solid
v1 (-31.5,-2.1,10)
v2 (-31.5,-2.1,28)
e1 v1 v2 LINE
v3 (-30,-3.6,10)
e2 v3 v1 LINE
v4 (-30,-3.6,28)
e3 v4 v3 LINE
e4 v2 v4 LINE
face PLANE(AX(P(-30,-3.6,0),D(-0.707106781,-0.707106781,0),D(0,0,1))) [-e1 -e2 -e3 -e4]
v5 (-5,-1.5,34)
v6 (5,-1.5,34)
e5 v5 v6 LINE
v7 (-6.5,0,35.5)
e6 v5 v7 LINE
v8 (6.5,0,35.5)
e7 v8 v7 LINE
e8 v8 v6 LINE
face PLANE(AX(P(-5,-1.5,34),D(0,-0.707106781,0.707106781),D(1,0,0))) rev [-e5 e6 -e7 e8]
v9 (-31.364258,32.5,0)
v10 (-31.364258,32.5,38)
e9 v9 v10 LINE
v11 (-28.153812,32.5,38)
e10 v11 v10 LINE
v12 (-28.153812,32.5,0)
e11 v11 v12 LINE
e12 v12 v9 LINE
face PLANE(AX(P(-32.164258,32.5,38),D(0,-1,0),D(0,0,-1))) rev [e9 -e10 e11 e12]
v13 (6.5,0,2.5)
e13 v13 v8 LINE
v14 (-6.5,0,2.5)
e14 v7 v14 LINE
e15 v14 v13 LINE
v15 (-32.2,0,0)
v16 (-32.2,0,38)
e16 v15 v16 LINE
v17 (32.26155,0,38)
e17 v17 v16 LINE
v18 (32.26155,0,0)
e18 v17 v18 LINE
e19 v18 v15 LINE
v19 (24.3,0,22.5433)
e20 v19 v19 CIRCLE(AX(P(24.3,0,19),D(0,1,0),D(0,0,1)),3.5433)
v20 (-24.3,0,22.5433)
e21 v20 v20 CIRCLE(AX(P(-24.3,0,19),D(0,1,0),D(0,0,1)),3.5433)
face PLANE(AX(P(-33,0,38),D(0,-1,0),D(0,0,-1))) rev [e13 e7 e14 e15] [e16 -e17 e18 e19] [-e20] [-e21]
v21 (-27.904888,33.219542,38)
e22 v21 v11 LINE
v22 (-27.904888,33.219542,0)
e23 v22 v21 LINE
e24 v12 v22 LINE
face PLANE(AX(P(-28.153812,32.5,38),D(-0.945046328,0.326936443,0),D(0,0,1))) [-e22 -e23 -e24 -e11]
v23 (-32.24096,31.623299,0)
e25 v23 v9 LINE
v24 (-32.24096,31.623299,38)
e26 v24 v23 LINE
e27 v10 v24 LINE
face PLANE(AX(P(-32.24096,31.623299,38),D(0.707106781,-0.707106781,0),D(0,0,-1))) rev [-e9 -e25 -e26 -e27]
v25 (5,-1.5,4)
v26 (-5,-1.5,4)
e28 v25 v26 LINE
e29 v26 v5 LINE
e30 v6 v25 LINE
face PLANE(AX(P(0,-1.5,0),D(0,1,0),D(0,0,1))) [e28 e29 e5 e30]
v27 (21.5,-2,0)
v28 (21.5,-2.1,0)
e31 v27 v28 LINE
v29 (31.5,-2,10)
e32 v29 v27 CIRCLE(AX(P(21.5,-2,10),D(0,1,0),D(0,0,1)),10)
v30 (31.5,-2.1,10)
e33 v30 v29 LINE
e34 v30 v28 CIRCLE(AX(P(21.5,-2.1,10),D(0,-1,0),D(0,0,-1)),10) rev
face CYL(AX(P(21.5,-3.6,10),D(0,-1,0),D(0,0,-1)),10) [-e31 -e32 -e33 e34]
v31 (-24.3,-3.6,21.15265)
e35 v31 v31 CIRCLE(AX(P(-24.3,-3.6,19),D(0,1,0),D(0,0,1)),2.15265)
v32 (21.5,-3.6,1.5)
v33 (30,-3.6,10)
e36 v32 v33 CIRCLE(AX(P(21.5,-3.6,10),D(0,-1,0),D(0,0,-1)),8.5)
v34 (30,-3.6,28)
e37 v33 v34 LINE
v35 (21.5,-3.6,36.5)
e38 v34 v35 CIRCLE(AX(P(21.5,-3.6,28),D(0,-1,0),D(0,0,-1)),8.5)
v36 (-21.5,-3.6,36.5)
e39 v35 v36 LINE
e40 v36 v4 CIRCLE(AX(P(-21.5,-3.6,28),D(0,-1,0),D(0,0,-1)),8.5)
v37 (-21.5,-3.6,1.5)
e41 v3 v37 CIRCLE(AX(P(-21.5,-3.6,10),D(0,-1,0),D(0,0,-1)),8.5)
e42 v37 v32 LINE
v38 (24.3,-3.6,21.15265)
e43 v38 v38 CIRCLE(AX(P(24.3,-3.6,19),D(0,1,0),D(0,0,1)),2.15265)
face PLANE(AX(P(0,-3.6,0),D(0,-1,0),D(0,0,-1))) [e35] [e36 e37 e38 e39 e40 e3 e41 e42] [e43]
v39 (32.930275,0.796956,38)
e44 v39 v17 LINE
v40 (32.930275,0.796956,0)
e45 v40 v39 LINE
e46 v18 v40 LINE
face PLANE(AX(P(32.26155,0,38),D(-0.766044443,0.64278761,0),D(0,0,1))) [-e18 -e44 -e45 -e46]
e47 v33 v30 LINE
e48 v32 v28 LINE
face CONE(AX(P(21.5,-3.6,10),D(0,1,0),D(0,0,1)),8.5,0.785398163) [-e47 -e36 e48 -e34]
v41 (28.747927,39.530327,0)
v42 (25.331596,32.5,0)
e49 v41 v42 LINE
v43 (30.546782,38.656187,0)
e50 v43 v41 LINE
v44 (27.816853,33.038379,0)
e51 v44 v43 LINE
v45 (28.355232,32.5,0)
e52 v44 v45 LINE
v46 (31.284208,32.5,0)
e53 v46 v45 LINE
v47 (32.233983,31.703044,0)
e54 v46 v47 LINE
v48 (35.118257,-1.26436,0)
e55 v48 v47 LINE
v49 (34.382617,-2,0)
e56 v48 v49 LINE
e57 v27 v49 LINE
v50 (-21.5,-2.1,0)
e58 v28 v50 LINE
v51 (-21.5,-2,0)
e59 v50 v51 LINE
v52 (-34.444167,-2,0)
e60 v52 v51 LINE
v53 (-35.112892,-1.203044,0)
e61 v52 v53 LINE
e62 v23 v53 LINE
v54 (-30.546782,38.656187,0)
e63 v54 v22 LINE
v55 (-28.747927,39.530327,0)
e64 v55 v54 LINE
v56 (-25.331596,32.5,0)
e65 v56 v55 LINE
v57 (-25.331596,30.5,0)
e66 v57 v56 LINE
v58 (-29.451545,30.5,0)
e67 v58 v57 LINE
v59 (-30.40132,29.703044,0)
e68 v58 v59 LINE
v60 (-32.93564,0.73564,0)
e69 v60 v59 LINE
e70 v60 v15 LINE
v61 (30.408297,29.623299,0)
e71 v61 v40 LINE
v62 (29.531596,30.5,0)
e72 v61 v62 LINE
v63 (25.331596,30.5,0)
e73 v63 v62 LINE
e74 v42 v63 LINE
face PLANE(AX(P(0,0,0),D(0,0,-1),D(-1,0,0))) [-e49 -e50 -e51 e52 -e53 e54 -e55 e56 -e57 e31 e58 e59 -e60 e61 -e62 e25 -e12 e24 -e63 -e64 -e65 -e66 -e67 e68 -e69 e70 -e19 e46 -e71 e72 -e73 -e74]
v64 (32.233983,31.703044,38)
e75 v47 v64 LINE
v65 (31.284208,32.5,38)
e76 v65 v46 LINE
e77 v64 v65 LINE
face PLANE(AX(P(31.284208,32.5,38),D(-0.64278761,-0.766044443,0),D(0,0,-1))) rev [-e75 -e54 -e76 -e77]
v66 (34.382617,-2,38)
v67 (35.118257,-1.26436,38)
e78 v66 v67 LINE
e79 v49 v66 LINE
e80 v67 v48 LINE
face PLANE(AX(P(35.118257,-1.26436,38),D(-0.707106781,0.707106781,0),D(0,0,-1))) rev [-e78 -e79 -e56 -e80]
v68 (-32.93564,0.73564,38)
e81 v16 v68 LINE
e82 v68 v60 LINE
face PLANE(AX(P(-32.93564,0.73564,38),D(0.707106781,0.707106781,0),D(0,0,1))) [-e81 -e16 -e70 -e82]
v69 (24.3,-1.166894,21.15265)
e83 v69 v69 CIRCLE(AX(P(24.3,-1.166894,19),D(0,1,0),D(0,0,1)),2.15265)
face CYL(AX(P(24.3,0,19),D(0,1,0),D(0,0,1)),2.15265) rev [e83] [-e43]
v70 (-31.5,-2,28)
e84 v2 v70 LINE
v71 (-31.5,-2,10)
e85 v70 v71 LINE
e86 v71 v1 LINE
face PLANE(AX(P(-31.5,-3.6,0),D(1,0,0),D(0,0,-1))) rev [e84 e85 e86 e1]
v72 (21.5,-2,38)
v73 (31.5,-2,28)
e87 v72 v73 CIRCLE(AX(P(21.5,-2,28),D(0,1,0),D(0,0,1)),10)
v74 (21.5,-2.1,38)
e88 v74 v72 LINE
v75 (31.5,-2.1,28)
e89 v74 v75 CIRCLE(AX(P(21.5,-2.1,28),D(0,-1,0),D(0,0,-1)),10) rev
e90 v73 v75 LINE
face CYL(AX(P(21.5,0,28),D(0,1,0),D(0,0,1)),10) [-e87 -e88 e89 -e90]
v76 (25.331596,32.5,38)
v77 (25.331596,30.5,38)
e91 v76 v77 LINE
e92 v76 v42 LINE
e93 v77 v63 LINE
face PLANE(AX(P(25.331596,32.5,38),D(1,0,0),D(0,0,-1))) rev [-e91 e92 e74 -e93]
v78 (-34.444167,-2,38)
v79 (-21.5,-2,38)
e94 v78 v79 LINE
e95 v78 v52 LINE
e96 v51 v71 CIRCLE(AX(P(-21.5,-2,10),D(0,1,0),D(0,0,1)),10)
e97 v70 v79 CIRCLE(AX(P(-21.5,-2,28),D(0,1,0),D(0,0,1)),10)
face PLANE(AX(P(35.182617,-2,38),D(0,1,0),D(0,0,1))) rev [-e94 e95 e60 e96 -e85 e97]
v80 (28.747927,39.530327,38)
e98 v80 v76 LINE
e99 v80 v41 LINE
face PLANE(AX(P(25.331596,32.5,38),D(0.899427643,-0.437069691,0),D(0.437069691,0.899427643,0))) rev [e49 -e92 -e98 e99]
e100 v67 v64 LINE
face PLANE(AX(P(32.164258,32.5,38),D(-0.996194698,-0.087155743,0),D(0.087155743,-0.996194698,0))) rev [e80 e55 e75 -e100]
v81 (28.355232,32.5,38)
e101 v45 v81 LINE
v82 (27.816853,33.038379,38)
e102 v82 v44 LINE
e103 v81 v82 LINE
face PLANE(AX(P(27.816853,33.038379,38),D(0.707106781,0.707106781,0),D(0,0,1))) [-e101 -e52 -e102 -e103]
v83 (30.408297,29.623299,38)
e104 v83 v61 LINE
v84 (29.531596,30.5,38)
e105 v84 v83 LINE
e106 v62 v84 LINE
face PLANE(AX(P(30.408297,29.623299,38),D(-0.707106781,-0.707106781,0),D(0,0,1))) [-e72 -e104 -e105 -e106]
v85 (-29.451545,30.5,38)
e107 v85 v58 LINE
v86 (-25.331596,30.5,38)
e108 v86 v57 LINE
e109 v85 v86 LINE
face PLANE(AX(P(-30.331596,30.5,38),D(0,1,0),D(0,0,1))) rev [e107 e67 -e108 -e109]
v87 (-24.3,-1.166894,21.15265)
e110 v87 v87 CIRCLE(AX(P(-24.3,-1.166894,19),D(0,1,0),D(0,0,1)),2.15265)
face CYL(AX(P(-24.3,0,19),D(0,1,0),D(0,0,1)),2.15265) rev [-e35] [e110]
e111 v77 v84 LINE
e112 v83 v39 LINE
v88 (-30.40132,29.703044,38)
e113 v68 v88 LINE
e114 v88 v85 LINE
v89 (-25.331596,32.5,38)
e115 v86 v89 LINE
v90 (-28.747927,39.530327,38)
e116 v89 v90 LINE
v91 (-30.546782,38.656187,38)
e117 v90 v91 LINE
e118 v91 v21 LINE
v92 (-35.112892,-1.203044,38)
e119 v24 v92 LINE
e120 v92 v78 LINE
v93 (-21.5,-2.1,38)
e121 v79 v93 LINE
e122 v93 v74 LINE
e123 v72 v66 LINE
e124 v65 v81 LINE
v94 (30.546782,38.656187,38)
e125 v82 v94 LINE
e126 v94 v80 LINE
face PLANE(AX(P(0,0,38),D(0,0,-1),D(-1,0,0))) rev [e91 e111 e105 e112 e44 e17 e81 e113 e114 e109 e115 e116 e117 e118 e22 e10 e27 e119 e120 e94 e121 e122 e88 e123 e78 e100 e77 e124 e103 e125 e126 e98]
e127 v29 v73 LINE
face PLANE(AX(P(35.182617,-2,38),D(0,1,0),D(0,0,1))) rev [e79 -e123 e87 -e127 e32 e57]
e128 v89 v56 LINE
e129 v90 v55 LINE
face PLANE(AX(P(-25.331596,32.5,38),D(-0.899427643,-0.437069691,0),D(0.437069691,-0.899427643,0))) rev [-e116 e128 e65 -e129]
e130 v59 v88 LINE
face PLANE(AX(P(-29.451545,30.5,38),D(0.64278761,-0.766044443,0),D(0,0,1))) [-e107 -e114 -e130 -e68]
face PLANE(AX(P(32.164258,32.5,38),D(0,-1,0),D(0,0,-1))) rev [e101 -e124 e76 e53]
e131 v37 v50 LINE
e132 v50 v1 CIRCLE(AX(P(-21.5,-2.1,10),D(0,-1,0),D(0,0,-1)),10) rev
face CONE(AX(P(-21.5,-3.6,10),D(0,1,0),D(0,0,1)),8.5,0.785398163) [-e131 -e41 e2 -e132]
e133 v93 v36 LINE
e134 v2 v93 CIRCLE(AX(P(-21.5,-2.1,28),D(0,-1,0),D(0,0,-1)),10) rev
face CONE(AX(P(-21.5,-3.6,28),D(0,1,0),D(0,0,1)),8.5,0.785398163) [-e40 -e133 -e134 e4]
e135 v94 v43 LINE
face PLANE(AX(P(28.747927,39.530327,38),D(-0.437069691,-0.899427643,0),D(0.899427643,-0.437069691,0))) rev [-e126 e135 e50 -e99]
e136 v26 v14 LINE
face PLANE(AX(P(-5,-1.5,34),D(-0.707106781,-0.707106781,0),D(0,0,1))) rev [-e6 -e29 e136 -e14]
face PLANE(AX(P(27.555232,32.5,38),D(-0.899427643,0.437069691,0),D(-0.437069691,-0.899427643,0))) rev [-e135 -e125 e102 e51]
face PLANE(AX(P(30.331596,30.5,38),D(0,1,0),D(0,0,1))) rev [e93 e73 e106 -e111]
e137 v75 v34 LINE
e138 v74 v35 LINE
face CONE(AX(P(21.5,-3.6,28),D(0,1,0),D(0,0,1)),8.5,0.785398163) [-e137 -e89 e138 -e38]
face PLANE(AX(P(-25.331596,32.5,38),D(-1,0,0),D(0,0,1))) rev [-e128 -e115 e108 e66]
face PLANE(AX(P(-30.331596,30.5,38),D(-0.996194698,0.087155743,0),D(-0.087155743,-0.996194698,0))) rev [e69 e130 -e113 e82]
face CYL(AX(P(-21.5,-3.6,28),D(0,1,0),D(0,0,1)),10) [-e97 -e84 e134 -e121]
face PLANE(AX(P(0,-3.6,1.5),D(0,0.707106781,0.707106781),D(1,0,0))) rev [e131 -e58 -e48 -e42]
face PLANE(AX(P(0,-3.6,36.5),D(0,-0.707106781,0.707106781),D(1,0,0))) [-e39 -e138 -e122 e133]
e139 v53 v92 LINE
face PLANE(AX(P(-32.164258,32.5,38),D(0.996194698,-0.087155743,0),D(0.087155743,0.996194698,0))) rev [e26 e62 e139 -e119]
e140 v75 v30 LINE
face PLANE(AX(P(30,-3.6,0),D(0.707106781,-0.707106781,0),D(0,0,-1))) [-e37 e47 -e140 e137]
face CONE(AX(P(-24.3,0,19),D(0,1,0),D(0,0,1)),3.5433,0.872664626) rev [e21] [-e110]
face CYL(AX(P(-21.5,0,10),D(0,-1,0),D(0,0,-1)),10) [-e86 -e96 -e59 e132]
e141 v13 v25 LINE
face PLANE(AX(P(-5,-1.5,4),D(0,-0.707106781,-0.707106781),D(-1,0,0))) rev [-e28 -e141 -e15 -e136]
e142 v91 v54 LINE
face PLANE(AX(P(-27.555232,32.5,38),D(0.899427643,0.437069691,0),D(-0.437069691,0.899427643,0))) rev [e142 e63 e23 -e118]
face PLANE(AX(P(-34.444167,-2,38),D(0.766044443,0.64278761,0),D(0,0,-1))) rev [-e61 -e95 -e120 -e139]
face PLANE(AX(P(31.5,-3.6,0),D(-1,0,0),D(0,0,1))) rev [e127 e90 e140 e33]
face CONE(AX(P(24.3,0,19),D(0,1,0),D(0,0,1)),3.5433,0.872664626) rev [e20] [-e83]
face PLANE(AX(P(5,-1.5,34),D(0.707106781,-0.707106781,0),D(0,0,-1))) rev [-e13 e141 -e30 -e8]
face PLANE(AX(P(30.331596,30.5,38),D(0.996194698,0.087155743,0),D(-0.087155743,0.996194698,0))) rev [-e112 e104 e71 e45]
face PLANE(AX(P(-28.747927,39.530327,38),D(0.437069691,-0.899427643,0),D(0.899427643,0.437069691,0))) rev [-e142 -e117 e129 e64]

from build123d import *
from OCP.BRepFilletAPI import BRepFilletAPI_MakeChamfer

# Parameters (mm, degrees)
BOSS_EXTRUDE1_DEPTH                               = 38
SKETCH5_W                                         = 63
SKETCH5_H                                         = 38
BOSS_EXTRUDE2_DEPTH                               = 1.6
SKETCH9_W                                         = 10
SKETCH9_H                                         = 30
CUT_EXTRUDE4_DEPTH                                = 1.5
CHAMFER4_SIZE                                     = 1.5
CHAMFER6_SIZE                                     = 0.8
CHAMFER6_SIZE2                                    = 0.738449877
CHAMFER7_SIZE                                     = 0.8
CHAMFER7_SIZE2                                    = 0.880050294
CHAMFER7_SIZE2_2                                  = 0.59857957
CSK_FOR_6_FLAT_HEAD_MACHINE_SCREW_100_D           = 4.3053
CSK_FOR_6_FLAT_HEAD_MACHINE_SCREW_100_DEPTH       = 3.6
CSK_FOR_6_FLAT_HEAD_MACHINE_SCREW_100_CSINK_D     = 7.0866
CSK_FOR_6_FLAT_HEAD_MACHINE_SCREW_100_CSINK_ANGLE = 100
FILLET1_R                                         = 10
CHAMFER10_SIZE                                    = 1.5


with BuildPart() as part:
    # Sketch1 → Boss-Extrude1 (new body)
    with BuildSketch(Plane.XY):
        Polygon((-32.16425811, 32.5), (-27.555232111, 32.5), (-30.546782223, 38.65618727), (-28.747926936, 39.530326652), (-25.331595762, 32.5), (-25.331595762, 30.5), (-30.331595762, 30.5), (-33, 0), (0, 0), (33, 0), (30.331595762, 30.5), (25.331595762, 30.5), (25.331595762, 32.5), (28.747926936, 39.530326652), (30.546782223, 38.65618727), (27.555232111, 32.5), (32.16425811, 32.5), (35.182617002, -2), (0, -2), (-35.182617002, -2), align=None)
    extrude(amount=BOSS_EXTRUDE1_DEPTH)

    # Sketch5 → Boss-Extrude2 (add)
    with BuildSketch(Plane.XZ.offset(2)):
        with Locations((0, 19)):
            Rectangle(SKETCH5_W, SKETCH5_H)
    extrude(amount=BOSS_EXTRUDE2_DEPTH)

    # Sketch9 → Cut-Extrude4 (cut)
    with BuildSketch(Plane(origin=(0, 0, 0), x_dir=(1, 0, 0), z_dir=(0, 1, 0))):
        with Locations((0, -19)):
            Rectangle(SKETCH9_W, SKETCH9_H)
    extrude(amount=-CUT_EXTRUDE4_DEPTH, mode=Mode.SUBTRACT)

    # Chamfer4
    chamfer4_edges = [part.edges().sort_by_distance(p)[0] for p in [
        (0, 0, 34),
        (-5, 0, 19),
        (0, 0, 4),
        (5, 0, 19),
    ]]
    chamfer(chamfer4_edges, length=CHAMFER4_SIZE - 0.0001)  # a hair under: the kernel refuses the full size

    # Chamfer6: one chamfer whose edges measure the first distance from different faces: ONE call of the kernel's chamfer builder (chamfer() names one face for all edges)
    chamfer6_edges_1 = [part.edges().sort_by_distance(p)[0] for p in [
        (-33, 0, 19),
    ]]
    chamfer6_side_1 = [part.faces().sort_by_distance(p)[0] for p in [
        (0, 0, 36.261477311),
    ]]
    chamfer6_edges_2 = [part.edges().sort_by_distance(p)[0] for p in [
        (33, 0, 19),
    ]]
    chamfer6_side_2 = [part.faces().sort_by_distance(p)[0] for p in [
        (31.665797881, 15.25, 19),
    ]]
    chamfer6_edges_3 = [part.edges().sort_by_distance(p)[0] for p in [
        (35.182617002, -2, 19),
    ]]
    chamfer6_side_3 = [part.faces().sort_by_distance(p)[0] for p in [
        (33.341308501, -2, 19),
    ]]
    chamfer6_edges_4 = [part.edges().sort_by_distance(p)[0] for p in [
        (-35.182617002, -2, 19),
    ]]
    chamfer6_side_4 = [part.faces().sort_by_distance(p)[0] for p in [
        (-33.673437556, 15.25, 19),
    ]]
    chamfer6 = BRepFilletAPI_MakeChamfer(part.part.solid().wrapped)
    for e in chamfer6_edges_1:
        chamfer6.Add(CHAMFER6_SIZE, CHAMFER6_SIZE2, e.wrapped, chamfer6_side_1[0].wrapped)  # the first distance lies on this face
    for e in chamfer6_edges_2:
        chamfer6.Add(CHAMFER6_SIZE, CHAMFER6_SIZE2, e.wrapped, chamfer6_side_2[0].wrapped)  # the first distance lies on this face
    for e in chamfer6_edges_3:
        chamfer6.Add(CHAMFER6_SIZE, CHAMFER6_SIZE2, e.wrapped, chamfer6_side_3[0].wrapped)  # the first distance lies on this face
    for e in chamfer6_edges_4:
        chamfer6.Add(CHAMFER6_SIZE, CHAMFER6_SIZE2, e.wrapped, chamfer6_side_4[0].wrapped)  # the first distance lies on this face
    add(Compound.cast(chamfer6.Shape()), mode=Mode.REPLACE)

    # Chamfer7: one chamfer whose edges measure the first distance from different faces: ONE call of the kernel's chamfer builder (chamfer() names one face for all edges)
    chamfer7_edges_1 = [part.edges().sort_by_distance(p)[0] for p in [
        (-30.331595762, 30.5, 19),
    ]]
    chamfer7_side_1 = [part.faces().sort_by_distance(p)[0] for p in [
        (-31.633617807, 15.617819926, 19),
    ]]
    chamfer7_edges_2 = [part.edges().sort_by_distance(p)[0] for p in [
        (30.331595762, 30.5, 19),
    ]]
    chamfer7_side_2 = [part.faces().sort_by_distance(p)[0] for p in [
        (27.831595762, 30.5, 19),
    ]]
    chamfer7_edges_3 = [part.edges().sort_by_distance(p)[0] for p in [
        (27.555232111, 32.5, 19),
    ]]
    chamfer7_side_3 = [part.faces().sort_by_distance(p)[0] for p in [
        (29.859745111, 32.5, 19),
    ]]
    chamfer7_edges_4 = [part.edges().sort_by_distance(p)[0] for p in [
        (32.16425811, 32.5, 19),
    ]]
    chamfer7_side_4 = [part.faces().sort_by_distance(p)[0] for p in [
        (33.641257483, 15.617819926, 19),
    ]]
    chamfer7_edges_5 = [part.edges().sort_by_distance(p)[0] for p in [
        (-32.16425811, 32.5, 19),
    ]]
    chamfer7_side_5 = [part.faces().sort_by_distance(p)[0] for p in [
        (-29.859745111, 32.5, 19),
    ]]
    chamfer7_edges_6 = [part.edges().sort_by_distance(p)[0] for p in [
        (-27.555232111, 32.5, 19),
    ]]
    chamfer7_side_6 = [part.faces().sort_by_distance(p)[0] for p in [
        (-29.051007167, 35.578093635, 19),
    ]]
    chamfer7 = BRepFilletAPI_MakeChamfer(part.part.solid().wrapped)
    for e in chamfer7_edges_1:
        chamfer7.Add(CHAMFER7_SIZE, CHAMFER7_SIZE2, e.wrapped, chamfer7_side_1[0].wrapped)  # the first distance lies on this face
    for e in chamfer7_edges_2:
        chamfer7.Add(CHAMFER7_SIZE, CHAMFER7_SIZE2, e.wrapped, chamfer7_side_2[0].wrapped)  # the first distance lies on this face
    for e in chamfer7_edges_3:
        chamfer7.Add(CHAMFER7_SIZE, CHAMFER7_SIZE2_2, e.wrapped, chamfer7_side_3[0].wrapped)  # the first distance lies on this face
    for e in chamfer7_edges_4:
        chamfer7.Add(CHAMFER7_SIZE, CHAMFER7_SIZE2, e.wrapped, chamfer7_side_4[0].wrapped)  # the first distance lies on this face
    for e in chamfer7_edges_5:
        chamfer7.Add(CHAMFER7_SIZE, CHAMFER7_SIZE2, e.wrapped, chamfer7_side_5[0].wrapped)  # the first distance lies on this face
    for e in chamfer7_edges_6:
        chamfer7.Add(CHAMFER7_SIZE, CHAMFER7_SIZE2_2, e.wrapped, chamfer7_side_6[0].wrapped)  # the first distance lies on this face
    add(Compound.cast(chamfer7.Shape()), mode=Mode.REPLACE)

    # CSK for #6 Flat Head Machine Screw (100)1
    with Locations(Plane(origin=(0, 0, 0), x_dir=(1, 0, 0), z_dir=(0, 1, 0))):
        with Locations((24.3, -19), (-24.3, -19)):
            CounterSinkHole(CSK_FOR_6_FLAT_HEAD_MACHINE_SCREW_100_D / 2, CSK_FOR_6_FLAT_HEAD_MACHINE_SCREW_100_CSINK_D / 2, depth=CSK_FOR_6_FLAT_HEAD_MACHINE_SCREW_100_DEPTH, counter_sink_angle=CSK_FOR_6_FLAT_HEAD_MACHINE_SCREW_100_CSINK_ANGLE)

    # Fillet1
    fillet1_edges = [part.edges().sort_by_distance(p)[0] for p in [
        (-31.5, -2.8, 0),
        (31.5, -2.8, 0),
        (31.5, -2.8, 38),
        (-31.5, -2.8, 38),
    ]]
    fillet(fillet1_edges, radius=FILLET1_R)

    # Chamfer10
    chamfer10_edges = [part.edges().sort_by_distance(p)[0] for p in [
        (-31.5, -3.6, 19),
        (0, -3.6, 38),
        (0, -3.6, 0),
        (31.5, -3.6, 19),
        (28.571067812, -3.6, 35.071067812),
        (28.571067812, -3.6, 2.928932188),
        (-28.571067812, -3.6, 2.928932188),
        (-28.571067812, -3.6, 35.071067812),
    ]]
    chamfer(chamfer10_edges, length=CHAMFER10_SIZE)


solid = part.part
